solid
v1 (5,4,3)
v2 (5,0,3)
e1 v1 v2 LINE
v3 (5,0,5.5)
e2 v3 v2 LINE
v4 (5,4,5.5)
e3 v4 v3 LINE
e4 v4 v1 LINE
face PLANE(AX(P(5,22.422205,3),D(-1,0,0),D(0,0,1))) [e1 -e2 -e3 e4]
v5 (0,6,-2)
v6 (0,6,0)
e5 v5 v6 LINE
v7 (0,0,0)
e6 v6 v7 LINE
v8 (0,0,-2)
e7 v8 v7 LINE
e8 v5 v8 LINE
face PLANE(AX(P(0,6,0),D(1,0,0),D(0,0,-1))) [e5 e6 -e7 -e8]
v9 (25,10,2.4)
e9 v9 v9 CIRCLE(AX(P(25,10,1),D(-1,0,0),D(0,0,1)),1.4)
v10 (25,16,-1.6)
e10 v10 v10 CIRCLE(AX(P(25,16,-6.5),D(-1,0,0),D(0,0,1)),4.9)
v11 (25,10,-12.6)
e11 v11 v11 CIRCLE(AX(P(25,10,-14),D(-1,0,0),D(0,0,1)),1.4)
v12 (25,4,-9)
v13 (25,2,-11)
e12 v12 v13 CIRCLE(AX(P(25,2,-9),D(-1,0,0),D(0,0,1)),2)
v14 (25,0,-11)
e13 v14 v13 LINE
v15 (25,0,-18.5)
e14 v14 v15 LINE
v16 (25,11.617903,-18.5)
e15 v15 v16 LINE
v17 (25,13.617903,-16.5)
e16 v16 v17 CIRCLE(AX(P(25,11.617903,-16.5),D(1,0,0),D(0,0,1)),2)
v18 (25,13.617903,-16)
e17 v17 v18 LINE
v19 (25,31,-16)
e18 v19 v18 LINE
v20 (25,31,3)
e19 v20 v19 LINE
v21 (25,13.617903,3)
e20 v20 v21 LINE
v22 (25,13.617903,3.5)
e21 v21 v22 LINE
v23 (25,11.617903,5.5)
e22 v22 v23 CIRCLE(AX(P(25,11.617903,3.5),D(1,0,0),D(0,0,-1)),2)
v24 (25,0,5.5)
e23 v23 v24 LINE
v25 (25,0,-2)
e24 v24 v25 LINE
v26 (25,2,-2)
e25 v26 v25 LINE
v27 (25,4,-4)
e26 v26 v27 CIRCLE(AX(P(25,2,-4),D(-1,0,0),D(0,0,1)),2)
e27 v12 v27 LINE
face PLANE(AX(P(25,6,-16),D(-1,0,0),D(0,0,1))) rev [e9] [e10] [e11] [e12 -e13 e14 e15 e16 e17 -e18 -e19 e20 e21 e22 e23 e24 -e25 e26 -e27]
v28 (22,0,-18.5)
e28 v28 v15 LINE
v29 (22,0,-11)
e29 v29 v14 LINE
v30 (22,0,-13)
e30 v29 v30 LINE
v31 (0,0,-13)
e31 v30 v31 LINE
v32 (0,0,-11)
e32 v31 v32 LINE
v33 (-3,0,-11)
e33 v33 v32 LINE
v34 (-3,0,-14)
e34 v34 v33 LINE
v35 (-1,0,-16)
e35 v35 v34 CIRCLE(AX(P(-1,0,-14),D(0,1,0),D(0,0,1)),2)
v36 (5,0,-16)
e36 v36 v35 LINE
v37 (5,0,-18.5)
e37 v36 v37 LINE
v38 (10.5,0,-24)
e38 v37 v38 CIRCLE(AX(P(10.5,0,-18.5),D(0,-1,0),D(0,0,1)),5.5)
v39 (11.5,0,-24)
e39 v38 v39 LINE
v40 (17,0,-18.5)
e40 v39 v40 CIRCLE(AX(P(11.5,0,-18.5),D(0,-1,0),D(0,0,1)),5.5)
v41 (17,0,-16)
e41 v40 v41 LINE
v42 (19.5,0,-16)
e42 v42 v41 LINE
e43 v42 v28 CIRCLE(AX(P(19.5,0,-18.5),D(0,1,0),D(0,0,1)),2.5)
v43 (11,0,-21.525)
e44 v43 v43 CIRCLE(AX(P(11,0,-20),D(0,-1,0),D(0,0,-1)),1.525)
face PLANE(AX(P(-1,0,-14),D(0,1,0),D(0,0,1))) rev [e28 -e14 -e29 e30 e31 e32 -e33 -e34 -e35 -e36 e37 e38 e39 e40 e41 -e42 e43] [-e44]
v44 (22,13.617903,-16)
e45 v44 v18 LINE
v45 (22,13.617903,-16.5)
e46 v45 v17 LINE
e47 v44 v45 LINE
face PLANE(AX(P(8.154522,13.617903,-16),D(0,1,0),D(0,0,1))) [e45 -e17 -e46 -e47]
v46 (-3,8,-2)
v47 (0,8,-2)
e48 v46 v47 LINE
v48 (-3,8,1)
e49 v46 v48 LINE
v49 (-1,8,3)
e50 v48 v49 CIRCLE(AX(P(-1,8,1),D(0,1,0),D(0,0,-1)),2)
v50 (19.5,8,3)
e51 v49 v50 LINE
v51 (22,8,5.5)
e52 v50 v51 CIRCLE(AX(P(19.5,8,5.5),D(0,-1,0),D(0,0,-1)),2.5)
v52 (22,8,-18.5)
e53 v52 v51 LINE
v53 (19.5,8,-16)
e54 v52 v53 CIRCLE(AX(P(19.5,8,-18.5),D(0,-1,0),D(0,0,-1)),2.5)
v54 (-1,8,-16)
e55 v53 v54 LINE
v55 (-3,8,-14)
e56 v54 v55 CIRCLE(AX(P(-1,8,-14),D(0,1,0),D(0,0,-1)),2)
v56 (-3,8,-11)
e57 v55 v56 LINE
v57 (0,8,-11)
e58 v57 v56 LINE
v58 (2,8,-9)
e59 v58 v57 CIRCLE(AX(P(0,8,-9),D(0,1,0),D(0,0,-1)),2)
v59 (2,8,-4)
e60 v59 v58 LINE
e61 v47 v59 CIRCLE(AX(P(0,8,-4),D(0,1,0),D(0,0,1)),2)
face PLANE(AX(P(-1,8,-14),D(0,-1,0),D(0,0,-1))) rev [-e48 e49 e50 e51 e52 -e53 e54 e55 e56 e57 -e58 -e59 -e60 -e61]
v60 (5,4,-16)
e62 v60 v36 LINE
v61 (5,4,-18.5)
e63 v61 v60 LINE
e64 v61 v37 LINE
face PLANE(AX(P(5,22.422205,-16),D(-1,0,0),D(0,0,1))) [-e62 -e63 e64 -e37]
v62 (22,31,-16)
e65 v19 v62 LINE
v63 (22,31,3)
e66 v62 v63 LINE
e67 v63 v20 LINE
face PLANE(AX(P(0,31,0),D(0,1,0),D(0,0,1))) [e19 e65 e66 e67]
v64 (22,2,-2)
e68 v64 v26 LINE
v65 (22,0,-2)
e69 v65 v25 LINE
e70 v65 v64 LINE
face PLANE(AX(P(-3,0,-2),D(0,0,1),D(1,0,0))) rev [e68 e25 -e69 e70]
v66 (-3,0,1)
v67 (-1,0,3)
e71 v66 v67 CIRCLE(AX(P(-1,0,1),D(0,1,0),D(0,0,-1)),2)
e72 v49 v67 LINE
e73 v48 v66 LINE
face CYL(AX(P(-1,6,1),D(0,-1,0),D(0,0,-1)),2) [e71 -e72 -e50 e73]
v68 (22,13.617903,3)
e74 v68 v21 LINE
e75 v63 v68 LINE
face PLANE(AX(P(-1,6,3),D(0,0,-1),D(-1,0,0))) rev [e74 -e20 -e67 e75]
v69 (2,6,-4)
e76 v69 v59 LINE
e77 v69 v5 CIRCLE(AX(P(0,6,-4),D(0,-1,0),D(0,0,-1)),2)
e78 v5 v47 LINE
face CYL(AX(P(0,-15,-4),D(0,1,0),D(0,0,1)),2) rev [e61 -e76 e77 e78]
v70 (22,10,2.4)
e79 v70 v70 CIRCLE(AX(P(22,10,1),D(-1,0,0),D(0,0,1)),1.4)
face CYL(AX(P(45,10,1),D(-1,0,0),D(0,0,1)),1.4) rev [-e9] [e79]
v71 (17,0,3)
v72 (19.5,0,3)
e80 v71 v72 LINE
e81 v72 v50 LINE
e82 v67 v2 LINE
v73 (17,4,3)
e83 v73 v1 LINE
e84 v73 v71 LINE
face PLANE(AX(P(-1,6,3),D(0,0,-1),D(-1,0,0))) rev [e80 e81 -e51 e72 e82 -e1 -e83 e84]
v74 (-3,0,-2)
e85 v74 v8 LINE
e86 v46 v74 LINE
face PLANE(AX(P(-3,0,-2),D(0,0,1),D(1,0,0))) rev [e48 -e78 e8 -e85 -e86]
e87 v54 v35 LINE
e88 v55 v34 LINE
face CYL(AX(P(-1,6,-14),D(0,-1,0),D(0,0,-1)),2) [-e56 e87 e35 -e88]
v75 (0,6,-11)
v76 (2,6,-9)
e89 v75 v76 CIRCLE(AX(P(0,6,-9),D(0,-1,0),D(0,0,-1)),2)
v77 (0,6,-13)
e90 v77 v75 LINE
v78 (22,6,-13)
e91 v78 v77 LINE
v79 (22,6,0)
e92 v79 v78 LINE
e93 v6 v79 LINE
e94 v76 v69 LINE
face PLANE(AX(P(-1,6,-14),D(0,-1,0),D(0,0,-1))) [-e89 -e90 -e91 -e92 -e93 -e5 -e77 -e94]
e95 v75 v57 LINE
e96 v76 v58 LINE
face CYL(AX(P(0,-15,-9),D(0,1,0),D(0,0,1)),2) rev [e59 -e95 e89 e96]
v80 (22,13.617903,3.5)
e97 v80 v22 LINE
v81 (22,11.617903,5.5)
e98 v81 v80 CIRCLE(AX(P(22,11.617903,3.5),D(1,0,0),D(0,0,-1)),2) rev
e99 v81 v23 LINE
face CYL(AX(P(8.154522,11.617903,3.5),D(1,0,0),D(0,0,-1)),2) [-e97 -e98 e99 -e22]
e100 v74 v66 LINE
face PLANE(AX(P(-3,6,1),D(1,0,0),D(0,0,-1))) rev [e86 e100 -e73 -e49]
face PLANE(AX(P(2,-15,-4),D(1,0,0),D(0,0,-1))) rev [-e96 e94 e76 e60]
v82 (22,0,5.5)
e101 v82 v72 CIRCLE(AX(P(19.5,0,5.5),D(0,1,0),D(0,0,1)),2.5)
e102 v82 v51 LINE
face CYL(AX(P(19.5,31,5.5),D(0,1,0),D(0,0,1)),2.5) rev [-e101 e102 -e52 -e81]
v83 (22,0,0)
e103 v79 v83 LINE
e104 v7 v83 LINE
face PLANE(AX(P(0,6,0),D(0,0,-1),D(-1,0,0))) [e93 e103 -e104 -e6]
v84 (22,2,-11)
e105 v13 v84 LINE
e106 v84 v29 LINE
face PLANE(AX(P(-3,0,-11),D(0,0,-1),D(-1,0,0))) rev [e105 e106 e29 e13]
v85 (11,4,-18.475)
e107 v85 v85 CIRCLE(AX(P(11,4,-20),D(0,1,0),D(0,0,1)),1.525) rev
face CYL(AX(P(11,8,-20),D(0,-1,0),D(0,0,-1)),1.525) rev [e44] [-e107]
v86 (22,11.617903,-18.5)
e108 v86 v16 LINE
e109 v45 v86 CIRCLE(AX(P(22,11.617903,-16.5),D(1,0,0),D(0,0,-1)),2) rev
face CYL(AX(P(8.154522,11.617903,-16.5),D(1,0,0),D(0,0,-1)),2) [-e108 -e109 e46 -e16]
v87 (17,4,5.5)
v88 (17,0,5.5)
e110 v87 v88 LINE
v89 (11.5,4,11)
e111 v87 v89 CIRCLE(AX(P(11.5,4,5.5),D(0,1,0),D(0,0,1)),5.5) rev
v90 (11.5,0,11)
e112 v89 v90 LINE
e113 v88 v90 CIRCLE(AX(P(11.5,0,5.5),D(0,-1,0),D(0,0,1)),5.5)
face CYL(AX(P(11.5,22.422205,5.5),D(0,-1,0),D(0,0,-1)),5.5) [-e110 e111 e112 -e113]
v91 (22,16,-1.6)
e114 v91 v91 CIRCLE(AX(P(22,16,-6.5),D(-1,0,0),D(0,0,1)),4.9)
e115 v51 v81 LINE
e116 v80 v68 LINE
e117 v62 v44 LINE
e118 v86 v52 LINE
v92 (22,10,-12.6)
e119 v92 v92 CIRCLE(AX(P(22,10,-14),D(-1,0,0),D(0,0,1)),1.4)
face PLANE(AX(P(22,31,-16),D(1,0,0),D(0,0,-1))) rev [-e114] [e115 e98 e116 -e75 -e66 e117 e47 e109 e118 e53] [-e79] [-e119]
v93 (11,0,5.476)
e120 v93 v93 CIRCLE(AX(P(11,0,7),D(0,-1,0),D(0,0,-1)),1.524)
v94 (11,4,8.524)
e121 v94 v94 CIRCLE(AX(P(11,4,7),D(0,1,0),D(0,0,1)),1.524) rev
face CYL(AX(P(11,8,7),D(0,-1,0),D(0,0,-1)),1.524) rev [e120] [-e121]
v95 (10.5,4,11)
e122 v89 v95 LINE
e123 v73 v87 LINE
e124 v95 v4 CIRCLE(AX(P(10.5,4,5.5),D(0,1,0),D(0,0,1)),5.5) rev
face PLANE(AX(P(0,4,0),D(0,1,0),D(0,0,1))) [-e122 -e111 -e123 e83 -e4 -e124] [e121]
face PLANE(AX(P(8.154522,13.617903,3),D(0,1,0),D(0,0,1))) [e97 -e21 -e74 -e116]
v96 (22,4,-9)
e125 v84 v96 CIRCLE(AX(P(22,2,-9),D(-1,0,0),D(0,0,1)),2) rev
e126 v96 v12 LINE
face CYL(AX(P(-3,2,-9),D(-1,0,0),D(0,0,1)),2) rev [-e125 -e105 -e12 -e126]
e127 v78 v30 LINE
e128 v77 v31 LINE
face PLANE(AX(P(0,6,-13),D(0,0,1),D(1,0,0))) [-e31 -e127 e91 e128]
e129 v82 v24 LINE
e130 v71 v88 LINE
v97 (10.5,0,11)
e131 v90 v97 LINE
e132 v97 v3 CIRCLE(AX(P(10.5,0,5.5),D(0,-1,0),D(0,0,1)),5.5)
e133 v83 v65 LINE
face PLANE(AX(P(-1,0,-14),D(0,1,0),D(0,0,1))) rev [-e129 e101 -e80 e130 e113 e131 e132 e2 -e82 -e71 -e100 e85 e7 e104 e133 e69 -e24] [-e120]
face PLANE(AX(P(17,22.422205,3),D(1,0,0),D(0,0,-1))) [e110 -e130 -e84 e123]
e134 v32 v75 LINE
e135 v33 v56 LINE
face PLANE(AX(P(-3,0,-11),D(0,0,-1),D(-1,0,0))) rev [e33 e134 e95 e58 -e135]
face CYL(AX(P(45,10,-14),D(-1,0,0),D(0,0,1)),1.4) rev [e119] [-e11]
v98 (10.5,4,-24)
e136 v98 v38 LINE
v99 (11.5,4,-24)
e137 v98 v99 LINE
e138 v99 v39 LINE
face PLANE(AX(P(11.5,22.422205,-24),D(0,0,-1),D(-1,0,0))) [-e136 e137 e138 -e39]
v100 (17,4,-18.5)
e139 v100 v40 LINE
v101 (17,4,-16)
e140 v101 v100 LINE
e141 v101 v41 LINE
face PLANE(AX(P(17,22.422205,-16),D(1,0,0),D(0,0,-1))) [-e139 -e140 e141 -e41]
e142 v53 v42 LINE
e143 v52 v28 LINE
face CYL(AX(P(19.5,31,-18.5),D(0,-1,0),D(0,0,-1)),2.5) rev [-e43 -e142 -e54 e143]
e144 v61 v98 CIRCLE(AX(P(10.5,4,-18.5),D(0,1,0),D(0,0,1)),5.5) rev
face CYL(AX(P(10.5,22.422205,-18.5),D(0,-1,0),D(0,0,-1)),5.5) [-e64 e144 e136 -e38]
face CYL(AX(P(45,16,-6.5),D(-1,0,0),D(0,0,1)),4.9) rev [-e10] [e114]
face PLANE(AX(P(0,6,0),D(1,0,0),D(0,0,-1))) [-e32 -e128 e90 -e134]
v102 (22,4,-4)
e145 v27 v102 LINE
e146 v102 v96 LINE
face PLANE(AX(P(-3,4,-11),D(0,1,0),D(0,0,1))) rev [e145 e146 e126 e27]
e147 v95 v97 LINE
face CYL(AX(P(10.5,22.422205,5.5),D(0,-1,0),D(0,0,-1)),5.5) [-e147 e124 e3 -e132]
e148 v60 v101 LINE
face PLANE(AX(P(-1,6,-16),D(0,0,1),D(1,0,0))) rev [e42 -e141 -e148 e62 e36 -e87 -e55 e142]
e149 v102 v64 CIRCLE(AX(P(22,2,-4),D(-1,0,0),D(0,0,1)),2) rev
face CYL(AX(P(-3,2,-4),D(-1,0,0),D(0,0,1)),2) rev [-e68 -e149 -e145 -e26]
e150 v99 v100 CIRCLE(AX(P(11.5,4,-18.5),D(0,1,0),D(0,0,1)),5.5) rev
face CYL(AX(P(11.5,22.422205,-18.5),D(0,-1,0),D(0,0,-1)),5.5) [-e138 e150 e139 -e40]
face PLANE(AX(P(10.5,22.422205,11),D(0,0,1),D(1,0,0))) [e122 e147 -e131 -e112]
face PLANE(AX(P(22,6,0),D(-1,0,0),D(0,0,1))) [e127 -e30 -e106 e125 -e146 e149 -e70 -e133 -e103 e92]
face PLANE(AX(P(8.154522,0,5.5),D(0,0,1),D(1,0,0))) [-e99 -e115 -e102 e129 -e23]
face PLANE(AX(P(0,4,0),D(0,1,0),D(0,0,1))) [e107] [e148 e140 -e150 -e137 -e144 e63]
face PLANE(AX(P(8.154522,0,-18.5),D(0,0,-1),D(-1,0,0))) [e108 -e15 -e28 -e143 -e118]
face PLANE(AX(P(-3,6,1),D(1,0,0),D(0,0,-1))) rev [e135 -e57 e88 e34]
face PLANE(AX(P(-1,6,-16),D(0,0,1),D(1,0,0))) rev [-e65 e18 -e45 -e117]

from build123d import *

# Parameters (mm, degrees)
SKETCH1_W           = 22
SKETCH1_H           = 13
BOSS_EXTRUDE1_DEPTH = 6
BOSS_EXTRUDE2_DEPTH = 2
BOSS_EXTRUDE3_DEPTH = 8
SKETCH4_R           = 1.525
SKETCH4_R_2         = 1.524
CUT_EXTRUDE1_DEPTH  = 36.566838488
SKETCH5_W           = 9
SKETCH5_H           = 4
CUT_EXTRUDE2_DEPTH  = 38.735924528
FILLET1_R           = 2
SKETCH6_W           = 12
SKETCH6_H           = 13.009000019
SKETCH6_W_2         = 15.838286437
CUT_EXTRUDE3_DEPTH  = 4
BOSS_EXTRUDE4_DEPTH = 23
CUT_EXTRUDE4_DEPTH  = 23
SKETCH9_R           = 4.9
CUT_EXTRUDE6_DEPTH  = 23
SKETCH10_R          = 1.4
CUT_EXTRUDE7_DEPTH  = 23
BOSS_EXTRUDE5_DEPTH = 3
FILLET2_R           = 2.5
FILLET3_R           = 2.5


with BuildPart() as part:
    # Sketch1 → Boss-Extrude1 (new body)
    with BuildSketch(Plane(origin=(0, 0, 0), x_dir=(1, 0, 0), z_dir=(0, 1, 0))):
        with BuildLine():
            Line((-1, -3), (23, -3))
            Line((23, -3), (25, -3))
            Line((25, -3), (25, -1))
            Line((25, -1), (25, 14))
            Line((25, 14), (25, 16))
            Line((25, 16), (23, 16))
            Line((23, 16), (-1, 16))
            ThreePointArc((-1, 16), (-2.414213562, 15.414213562), (-3, 14))
            Line((-3, 14), (-3, -1))
            ThreePointArc((-3, -1), (-2.414213562, -2.414213562), (-1, -3))
        make_face()
        with Locations((11, 6.5)):
            Rectangle(SKETCH1_W, SKETCH1_H, mode=Mode.SUBTRACT)
    extrude(amount=BOSS_EXTRUDE1_DEPTH)

    # Sketch2 → Boss-Extrude2 (add)
    with BuildSketch(Plane(origin=(0, 6, 0), x_dir=(1, 0, 0), z_dir=(0, 1, 0))):
        with BuildLine():
            Line((25, 14), (25, -1))
            Line((25, -1), (25, -3))
            Line((25, -3), (23, -3))
            Line((23, -3), (-1, -3))
            ThreePointArc((-1, -3), (-2.414213562, -2.414213562), (-3, -1))
            Line((-3, -1), (-3, 14))
            ThreePointArc((-3, 14), (-2.414213562, 15.414213562), (-1, 16))
            Line((-1, 16), (23, 16))
            Line((23, 16), (25, 16))
            Line((25, 16), (25, 14))
        make_face()
    extrude(amount=BOSS_EXTRUDE2_DEPTH)

    # Sketch3 → Boss-Extrude3 (add)
    with BuildSketch(Plane.XZ):
        with BuildLine():
            Line((5, 3), (17, 3))
            Line((17, 3), (17, 5.5))
            ThreePointArc((17, 5.5), (15.389087297, 9.389087297), (11.5, 11))
            Line((11.5, 11), (10.5, 11))
            ThreePointArc((10.5, 11), (6.610912703, 9.389087297), (5, 5.5))
            Line((5, 5.5), (5, 3))
        make_face()
        with BuildLine():
            Line((17, -16), (5, -16))
            Line((5, -16), (5, -18.5))
            ThreePointArc((5, -18.5), (6.610912703, -22.389087297), (10.5, -24))
            Line((10.5, -24), (11.5, -24))
            ThreePointArc((11.5, -24), (15.389087297, -22.389087297), (17, -18.5))
            Line((17, -18.5), (17, -16))
        make_face()
    extrude(amount=-BOSS_EXTRUDE3_DEPTH)

    # Sketch4 → Cut-Extrude1 (cut, through all)
    with BuildSketch(Plane(origin=(0, 0, 0), x_dir=(-1, 0, 0), z_dir=(0, -1, 0))):
        with Locations(Location((-11, 20, 0), (0, 0, 90))):
            Circle(SKETCH4_R)
        with Locations(Location((-11, -7, 0), (0, 0, 90))):
            Circle(SKETCH4_R_2)
    extrude(amount=-CUT_EXTRUDE1_DEPTH, mode=Mode.SUBTRACT)

    # Sketch5 → Cut-Extrude2 (cut, through all)
    with BuildSketch(Plane(origin=(25, 0, 0), x_dir=(0, 0, -1), z_dir=(1, 0, 0))):
        with Locations((6.5, 2)):
            Rectangle(SKETCH5_W, SKETCH5_H)
    extrude(amount=-CUT_EXTRUDE2_DEPTH, mode=Mode.SUBTRACT)

    # Fillet1
    fillet1_edges = [part.edges().sort_by_distance(p)[0] for p in [
        (-1.5, 4, -11),
        (-1.5, 4, -2),
        (23.5, 4, -11),
        (23.5, 4, -2),
    ]]
    fillet(fillet1_edges, radius=FILLET1_R)

    # Sketch6 → Cut-Extrude3 (cut)
    with BuildSketch(Plane(origin=(0, 8, 0), x_dir=(1, 0, 0), z_dir=(0, 1, 0))):
        with Locations((11, 22.504500009)):
            Rectangle(SKETCH6_W, SKETCH6_H)
        with Locations((11.149066226, -9.50450001)):
            Rectangle(SKETCH6_W_2, SKETCH6_H)
    extrude(amount=-CUT_EXTRUDE3_DEPTH, mode=Mode.SUBTRACT)

    # Sketch7 → Boss-Extrude4 (add)
    with BuildSketch(Plane(origin=(0, 8, 0), x_dir=(1, 0, 0), z_dir=(0, 1, 0))):
        Polygon((23, 16), (22, 16), (22, -3), (23, -3), (25, -3), (25, -1), (25, 14), (25, 16), align=None)
    extrude(amount=BOSS_EXTRUDE4_DEPTH)

    # Sketch8 → Cut-Extrude4 (cut)
    with BuildSketch(Plane(origin=(0, 8, 0), x_dir=(1, 0, 0), z_dir=(0, 1, 0))):
        with BuildLine():
            Line((-3, 2), (0, 2))
            ThreePointArc((0, 2), (1.414213562, 2.585786438), (2, 4))
            Line((2, 4), (2, 9))
            ThreePointArc((2, 9), (1.414213562, 10.414213562), (0, 11))
            Line((0, 11), (-3, 11))
            Line((-3, 11), (-3, 2))
        make_face()
    extrude(amount=-CUT_EXTRUDE4_DEPTH, mode=Mode.SUBTRACT)

    # Sketch9 → Cut-Extrude6 (cut)
    with BuildSketch(Plane.ZY.offset(-22)):
        with Locations((-6.5, 16)):
            Circle(SKETCH9_R)
    extrude(amount=-CUT_EXTRUDE6_DEPTH, mode=Mode.SUBTRACT)

    # Sketch10 → Cut-Extrude7 (cut)
    with BuildSketch(Plane.ZY.offset(-22)):
        with Locations((-14, 10)):
            Circle(SKETCH10_R)
        with Locations((1, 10)):
            Circle(SKETCH10_R)
    extrude(amount=-CUT_EXTRUDE7_DEPTH, mode=Mode.SUBTRACT)

    # Sketch11 → Boss-Extrude5 (add)
    with BuildSketch(Plane(origin=(25, 0, 0), x_dir=(0, 0, -1), z_dir=(1, 0, 0))):
        with BuildLine():
            Line((-3, 0), (-5.5, 0))
            Line((-5.5, 0), (-5.5, 11.617902622))
            ThreePointArc((-5.5, 11.617902622), (-4.914213562, 13.032116185), (-3.5, 13.617902622))
            Line((-3.5, 13.617902622), (-3, 13.617902622))
            Line((-3, 13.617902622), (-3, 0))
        make_face()
        with BuildLine():
            Line((16, 0), (18.5, 0))
            Line((18.5, 0), (18.5, 11.617902622))
            ThreePointArc((18.5, 11.617902622), (17.914213562, 13.032116185), (16.5, 13.617902622))
            Line((16.5, 13.617902622), (16, 13.617902622))
            Line((16, 13.617902622), (16, 0))
        make_face()
    extrude(amount=-BOSS_EXTRUDE5_DEPTH)

    # Fillet2
    fillet2_edges = [part.edges().sort_by_distance(p)[0] for p in [
        (22, 4, 3),
    ]]
    fillet(fillet2_edges, radius=FILLET2_R - 0.0001)  # a hair under: the kernel refuses the full size

    # Fillet3
    fillet3_edges = [part.edges().sort_by_distance(p)[0] for p in [
        (22, 4, -16),
    ]]
    fillet(fillet3_edges, radius=FILLET3_R - 0.0001)  # a hair under: the kernel refuses the full size


solid = part.part
